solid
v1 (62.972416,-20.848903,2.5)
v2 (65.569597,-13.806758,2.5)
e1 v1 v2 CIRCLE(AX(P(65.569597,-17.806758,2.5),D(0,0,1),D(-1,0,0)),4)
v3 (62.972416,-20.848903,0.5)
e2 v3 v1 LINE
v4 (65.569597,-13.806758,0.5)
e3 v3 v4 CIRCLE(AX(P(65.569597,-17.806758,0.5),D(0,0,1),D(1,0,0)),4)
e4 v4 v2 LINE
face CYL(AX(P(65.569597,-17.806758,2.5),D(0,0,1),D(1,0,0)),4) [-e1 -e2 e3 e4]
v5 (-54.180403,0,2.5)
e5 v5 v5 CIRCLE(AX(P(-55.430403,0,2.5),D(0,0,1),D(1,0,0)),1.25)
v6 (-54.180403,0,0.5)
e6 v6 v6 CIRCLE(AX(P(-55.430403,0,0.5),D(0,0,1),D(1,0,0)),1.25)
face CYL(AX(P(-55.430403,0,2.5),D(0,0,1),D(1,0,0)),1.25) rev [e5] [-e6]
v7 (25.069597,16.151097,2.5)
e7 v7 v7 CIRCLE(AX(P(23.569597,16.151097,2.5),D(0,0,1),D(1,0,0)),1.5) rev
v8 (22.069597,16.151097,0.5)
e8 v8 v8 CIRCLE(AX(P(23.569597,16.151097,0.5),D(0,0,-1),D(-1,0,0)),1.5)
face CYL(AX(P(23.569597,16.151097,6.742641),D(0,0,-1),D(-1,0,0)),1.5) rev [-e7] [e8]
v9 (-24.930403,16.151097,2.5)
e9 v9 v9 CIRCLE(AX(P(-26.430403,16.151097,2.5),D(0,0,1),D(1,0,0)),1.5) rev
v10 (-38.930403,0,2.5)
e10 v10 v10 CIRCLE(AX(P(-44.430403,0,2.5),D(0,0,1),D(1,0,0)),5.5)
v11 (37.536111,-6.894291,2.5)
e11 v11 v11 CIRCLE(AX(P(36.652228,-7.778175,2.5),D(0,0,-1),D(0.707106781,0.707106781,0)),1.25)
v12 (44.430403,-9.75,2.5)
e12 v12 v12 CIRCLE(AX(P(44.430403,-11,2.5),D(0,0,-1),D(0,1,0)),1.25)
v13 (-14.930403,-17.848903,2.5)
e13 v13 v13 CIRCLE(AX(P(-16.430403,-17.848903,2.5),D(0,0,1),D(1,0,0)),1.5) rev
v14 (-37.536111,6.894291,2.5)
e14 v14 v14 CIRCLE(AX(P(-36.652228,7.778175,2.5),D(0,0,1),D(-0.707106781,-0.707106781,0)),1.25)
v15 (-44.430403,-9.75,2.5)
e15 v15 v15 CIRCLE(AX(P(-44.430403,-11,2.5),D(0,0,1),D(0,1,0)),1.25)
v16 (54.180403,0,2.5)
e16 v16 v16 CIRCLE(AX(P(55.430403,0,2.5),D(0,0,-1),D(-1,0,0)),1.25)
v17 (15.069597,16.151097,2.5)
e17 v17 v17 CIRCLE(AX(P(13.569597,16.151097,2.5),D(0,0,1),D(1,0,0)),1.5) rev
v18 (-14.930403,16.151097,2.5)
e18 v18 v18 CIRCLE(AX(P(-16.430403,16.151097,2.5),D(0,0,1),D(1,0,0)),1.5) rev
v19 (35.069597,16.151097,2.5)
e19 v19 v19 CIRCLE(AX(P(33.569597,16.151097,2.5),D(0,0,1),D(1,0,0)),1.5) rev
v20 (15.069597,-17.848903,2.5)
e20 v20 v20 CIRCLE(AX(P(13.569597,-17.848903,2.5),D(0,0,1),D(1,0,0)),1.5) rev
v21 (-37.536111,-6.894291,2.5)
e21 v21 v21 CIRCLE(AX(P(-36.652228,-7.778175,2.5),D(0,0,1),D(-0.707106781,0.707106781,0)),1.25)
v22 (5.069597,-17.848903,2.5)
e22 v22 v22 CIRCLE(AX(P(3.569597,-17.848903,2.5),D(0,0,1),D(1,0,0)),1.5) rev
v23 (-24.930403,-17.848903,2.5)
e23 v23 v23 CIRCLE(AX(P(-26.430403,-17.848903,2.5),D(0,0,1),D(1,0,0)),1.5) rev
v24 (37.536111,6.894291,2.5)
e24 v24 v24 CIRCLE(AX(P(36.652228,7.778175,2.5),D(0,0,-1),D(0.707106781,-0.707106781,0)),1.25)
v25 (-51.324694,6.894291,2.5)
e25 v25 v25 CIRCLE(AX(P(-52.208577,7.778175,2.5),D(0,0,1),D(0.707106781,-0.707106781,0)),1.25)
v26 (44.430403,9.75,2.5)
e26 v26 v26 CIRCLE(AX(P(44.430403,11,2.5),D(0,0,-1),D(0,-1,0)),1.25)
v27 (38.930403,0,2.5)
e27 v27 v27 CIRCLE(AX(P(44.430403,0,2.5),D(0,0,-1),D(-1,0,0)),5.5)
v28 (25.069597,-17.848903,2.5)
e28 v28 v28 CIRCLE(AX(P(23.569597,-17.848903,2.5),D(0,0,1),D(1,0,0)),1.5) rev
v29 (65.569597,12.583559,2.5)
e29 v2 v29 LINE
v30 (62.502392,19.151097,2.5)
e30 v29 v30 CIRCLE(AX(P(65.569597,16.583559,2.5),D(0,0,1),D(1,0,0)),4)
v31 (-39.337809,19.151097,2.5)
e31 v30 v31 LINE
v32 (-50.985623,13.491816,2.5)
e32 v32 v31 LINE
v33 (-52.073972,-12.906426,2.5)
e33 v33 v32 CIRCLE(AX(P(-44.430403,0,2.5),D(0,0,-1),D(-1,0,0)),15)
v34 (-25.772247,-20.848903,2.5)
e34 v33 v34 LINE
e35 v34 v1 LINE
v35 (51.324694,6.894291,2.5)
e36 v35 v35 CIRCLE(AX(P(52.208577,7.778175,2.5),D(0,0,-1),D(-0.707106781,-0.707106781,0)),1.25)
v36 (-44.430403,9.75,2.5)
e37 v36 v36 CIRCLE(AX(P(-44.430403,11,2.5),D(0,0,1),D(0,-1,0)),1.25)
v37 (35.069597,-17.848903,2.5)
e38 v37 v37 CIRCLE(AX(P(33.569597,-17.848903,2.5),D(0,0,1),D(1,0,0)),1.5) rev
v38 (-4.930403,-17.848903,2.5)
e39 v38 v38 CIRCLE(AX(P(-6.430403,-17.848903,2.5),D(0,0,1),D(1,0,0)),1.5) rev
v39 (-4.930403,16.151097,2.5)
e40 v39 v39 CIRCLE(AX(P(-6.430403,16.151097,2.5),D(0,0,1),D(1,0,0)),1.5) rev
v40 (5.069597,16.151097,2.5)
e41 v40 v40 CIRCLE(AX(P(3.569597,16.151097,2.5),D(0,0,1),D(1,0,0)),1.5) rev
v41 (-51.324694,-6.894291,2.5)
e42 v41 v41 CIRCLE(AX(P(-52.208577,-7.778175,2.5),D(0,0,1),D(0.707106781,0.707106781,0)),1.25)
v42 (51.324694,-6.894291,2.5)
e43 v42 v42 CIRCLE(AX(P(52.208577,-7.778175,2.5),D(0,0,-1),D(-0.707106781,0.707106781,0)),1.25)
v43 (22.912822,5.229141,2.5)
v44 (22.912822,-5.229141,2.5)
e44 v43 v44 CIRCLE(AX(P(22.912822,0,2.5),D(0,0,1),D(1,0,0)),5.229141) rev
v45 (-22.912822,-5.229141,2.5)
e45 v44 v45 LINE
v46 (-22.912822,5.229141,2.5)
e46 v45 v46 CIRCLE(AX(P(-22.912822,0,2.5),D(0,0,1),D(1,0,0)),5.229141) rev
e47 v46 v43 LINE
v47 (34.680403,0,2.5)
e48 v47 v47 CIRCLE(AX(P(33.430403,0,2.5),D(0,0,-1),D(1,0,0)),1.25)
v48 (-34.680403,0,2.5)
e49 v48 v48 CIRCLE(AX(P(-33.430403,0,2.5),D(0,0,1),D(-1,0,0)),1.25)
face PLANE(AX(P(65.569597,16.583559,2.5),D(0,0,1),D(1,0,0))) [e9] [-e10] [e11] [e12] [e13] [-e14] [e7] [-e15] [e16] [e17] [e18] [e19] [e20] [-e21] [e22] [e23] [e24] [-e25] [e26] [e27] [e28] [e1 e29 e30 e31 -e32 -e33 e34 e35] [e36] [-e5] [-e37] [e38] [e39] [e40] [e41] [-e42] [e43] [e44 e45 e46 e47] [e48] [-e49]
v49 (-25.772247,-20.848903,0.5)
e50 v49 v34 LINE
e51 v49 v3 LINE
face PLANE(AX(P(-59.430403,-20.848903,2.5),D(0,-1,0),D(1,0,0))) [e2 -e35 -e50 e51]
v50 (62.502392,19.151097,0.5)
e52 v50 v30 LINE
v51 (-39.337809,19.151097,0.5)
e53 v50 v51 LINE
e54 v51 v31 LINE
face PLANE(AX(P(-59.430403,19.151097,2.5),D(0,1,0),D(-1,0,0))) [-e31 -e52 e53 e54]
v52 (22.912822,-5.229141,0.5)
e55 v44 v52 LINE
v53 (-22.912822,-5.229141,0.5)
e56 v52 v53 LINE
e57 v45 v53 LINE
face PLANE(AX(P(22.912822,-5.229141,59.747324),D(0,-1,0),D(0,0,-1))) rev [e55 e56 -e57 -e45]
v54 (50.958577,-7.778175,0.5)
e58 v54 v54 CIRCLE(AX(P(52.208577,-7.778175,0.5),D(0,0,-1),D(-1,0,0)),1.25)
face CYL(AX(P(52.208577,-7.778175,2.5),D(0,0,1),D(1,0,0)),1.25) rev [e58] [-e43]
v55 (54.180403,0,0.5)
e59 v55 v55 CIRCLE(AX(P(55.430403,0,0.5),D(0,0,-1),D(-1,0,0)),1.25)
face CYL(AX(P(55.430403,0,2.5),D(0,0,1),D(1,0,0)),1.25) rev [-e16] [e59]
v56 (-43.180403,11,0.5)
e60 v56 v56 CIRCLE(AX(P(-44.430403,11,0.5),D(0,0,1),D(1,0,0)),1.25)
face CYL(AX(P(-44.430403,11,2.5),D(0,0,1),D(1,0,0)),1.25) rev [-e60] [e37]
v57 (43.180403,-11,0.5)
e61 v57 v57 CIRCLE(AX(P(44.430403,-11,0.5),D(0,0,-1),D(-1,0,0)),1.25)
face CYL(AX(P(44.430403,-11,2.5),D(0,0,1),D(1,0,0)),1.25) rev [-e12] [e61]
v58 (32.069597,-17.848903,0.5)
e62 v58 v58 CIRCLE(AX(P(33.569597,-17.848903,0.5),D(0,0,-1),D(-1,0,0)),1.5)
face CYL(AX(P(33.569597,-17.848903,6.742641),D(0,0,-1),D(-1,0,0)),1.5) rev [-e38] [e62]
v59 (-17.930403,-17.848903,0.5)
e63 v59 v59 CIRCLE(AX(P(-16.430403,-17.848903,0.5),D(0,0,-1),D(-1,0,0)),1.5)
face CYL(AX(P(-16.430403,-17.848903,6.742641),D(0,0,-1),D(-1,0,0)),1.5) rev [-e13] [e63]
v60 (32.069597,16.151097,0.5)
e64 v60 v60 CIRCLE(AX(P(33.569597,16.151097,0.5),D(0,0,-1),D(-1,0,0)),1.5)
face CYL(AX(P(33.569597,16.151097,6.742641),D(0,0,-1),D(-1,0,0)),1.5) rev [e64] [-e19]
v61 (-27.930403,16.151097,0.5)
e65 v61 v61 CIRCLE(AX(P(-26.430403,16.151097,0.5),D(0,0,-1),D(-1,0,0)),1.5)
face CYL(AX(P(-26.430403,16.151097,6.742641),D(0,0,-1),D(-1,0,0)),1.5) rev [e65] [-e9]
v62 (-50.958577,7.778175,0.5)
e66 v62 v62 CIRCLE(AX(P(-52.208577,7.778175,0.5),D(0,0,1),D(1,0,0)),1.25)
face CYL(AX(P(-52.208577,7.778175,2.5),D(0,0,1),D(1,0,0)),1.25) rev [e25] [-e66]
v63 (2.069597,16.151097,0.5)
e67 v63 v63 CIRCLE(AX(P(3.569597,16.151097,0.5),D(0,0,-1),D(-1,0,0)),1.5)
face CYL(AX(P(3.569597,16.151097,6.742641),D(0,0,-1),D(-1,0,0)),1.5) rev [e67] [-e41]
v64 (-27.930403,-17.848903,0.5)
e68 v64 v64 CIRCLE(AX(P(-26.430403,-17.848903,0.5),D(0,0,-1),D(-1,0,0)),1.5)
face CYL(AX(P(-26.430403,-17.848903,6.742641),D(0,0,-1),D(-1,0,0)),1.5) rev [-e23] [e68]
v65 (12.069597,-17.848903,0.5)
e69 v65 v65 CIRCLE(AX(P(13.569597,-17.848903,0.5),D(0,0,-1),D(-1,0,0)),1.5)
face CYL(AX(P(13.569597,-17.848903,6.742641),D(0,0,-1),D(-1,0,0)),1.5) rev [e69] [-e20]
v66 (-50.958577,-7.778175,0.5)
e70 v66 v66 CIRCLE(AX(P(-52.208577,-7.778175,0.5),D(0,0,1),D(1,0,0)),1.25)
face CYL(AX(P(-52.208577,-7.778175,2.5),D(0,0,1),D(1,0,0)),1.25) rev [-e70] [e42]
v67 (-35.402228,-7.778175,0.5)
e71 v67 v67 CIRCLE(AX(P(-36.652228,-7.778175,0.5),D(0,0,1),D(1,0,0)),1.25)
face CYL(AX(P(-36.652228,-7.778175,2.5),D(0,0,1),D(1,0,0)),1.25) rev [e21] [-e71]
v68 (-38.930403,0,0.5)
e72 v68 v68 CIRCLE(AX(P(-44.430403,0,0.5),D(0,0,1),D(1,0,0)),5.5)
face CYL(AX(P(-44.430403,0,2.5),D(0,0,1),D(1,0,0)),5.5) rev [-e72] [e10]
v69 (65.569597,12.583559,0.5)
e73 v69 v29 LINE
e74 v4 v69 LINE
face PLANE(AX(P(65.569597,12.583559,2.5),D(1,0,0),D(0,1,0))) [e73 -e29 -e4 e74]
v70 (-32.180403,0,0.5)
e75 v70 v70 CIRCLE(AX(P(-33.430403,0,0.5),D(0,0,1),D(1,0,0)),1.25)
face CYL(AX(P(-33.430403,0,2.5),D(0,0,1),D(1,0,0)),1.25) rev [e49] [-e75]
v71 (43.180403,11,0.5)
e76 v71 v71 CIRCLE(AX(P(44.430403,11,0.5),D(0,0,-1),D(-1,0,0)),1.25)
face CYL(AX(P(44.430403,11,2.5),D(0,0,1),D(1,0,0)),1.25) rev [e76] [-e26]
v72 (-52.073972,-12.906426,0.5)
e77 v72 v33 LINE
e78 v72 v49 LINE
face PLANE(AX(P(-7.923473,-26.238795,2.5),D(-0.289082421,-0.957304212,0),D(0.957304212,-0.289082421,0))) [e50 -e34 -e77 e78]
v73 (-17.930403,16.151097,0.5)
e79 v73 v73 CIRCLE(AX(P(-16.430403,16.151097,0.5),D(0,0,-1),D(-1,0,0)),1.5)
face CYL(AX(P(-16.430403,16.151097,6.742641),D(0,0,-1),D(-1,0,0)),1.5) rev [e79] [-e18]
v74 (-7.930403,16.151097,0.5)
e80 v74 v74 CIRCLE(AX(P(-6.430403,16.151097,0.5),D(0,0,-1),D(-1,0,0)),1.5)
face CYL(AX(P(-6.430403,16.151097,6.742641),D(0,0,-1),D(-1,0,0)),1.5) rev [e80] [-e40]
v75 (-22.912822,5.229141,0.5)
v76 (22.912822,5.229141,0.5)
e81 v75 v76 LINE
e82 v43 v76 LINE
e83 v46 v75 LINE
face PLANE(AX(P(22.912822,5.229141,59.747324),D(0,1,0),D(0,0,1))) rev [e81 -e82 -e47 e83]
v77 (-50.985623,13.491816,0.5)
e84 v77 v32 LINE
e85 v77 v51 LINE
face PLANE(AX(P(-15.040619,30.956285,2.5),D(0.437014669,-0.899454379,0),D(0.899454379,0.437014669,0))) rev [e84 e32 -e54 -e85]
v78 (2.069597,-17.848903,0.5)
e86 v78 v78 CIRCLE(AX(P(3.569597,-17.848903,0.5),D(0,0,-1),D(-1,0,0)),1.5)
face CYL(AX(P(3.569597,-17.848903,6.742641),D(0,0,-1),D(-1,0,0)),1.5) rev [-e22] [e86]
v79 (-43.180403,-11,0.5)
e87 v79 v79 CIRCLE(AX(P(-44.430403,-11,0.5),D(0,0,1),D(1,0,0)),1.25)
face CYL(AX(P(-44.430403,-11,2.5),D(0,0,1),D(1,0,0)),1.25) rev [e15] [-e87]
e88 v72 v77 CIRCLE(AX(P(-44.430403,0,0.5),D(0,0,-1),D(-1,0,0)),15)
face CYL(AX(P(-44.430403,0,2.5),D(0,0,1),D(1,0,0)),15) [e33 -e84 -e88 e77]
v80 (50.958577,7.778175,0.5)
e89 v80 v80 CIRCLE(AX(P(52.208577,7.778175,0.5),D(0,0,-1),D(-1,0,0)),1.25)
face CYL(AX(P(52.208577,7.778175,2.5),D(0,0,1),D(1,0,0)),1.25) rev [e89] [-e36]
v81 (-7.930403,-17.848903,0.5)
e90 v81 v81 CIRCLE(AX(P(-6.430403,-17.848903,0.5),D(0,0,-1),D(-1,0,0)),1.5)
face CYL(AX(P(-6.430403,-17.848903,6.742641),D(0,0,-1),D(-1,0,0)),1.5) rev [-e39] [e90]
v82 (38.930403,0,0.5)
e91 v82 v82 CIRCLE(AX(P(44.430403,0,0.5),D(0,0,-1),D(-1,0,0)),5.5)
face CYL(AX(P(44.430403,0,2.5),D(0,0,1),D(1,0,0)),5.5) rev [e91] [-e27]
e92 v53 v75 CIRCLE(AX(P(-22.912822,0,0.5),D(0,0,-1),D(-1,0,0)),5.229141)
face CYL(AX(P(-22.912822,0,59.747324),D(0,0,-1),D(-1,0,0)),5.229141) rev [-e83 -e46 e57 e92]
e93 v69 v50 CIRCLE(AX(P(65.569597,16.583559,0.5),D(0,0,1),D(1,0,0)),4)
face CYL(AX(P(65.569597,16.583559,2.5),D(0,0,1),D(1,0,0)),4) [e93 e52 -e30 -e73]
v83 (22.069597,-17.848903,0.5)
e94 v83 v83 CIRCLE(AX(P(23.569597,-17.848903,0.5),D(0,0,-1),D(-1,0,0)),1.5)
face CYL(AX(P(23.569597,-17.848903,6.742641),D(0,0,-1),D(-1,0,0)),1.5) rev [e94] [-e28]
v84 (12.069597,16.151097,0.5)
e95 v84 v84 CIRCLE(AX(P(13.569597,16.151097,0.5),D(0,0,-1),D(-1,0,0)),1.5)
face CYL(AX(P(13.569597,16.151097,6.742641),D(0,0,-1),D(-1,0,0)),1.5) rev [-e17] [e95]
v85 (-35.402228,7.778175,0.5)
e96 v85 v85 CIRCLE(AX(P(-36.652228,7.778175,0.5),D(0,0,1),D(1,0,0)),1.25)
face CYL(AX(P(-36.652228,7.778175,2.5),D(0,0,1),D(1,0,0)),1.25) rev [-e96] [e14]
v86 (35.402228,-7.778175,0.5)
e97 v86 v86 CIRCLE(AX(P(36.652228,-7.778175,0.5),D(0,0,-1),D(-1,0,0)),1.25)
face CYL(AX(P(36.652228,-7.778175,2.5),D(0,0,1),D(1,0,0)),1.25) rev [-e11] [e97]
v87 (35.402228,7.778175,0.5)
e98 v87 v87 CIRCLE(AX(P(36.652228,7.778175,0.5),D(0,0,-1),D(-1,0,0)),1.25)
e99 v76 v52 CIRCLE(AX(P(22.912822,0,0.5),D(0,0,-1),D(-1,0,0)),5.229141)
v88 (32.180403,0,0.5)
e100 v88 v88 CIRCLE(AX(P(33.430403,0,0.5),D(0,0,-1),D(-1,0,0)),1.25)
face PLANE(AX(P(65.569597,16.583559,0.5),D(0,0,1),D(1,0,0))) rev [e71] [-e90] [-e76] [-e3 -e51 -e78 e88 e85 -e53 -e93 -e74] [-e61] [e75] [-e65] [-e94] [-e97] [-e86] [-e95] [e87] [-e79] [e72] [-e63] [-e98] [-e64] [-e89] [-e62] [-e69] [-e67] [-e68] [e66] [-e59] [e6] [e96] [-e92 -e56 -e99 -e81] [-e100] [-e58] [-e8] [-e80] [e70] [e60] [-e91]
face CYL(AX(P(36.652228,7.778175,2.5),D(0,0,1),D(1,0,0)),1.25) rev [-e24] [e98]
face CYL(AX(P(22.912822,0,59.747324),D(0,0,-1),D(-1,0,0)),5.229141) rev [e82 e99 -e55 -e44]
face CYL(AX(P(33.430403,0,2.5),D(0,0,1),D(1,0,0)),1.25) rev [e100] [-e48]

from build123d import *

# Parameters (mm, degrees)
RESSALTO_EXTRUS_O1_DEPTH      = 2.5
ESBO_O2_R                     = 5.5
CORTE_EXTRUS_O1_DEPTH         = 5
ESBO_O3_R                     = 1.25
CORTE_EXTRUS_O2_DEPTH         = 5
PADR_OCIRCULAR1_COUNT         = 8
ESPELHAR1_COPY_1_SKETCH_R     = 1.25
ESPELHAR1_COPY_1_DEPTH        = 5
ESPELHAR1_COPY_2_SKETCH_R     = 1.25
ESPELHAR1_COPY_2_DEPTH        = 5
ESPELHAR1_COPY_3_SKETCH_R     = 1.25
ESPELHAR1_COPY_3_DEPTH        = 5
ESPELHAR1_COPY_4_SKETCH_R     = 1.25
ESPELHAR1_COPY_4_DEPTH        = 5
ESPELHAR1_COPY_5_SKETCH_R     = 1.25
ESPELHAR1_COPY_5_DEPTH        = 5
ESPELHAR1_COPY_6_SKETCH_R     = 1.25
ESPELHAR1_COPY_6_DEPTH        = 5
ESPELHAR1_COPY_7_SKETCH_R     = 1.25
ESPELHAR1_COPY_7_DEPTH        = 5
CORTE_EXTRUS_O5_DEPTH         = 74.078475416
CORTE_EXTRUS_O5_DEPTH_BACK    = 74.078475416
CONVERTER_S_LIDO1_START       = -2.5
CONVERTER_S_LIDO1_OUTLINE_R   = 1.25
CONVERTER_S_LIDO1_OUTLINE_R_2 = 5.5
CONVERTER_S_LIDO1_DEPTH       = 3
ESBO_O8_R                     = 1.5
CORTE_EXTRUS_O3_DEPTH         = 2
PADR_O_LINEAR1_COUNT          = 7
PADR_O_LINEAR1_PITCH          = 10
CORTE_EXTRUS_O4_DEPTH         = 2


# Read off the part's stored shape, not the designer's step: Converter-Sólido1
with BuildPart() as part:
    # Esboço1 → Ressalto-extrusão1 (new, symmetric)
    with BuildSketch(Plane.XY):
        with BuildLine():
            Line((-59.430402553, 19.151096923), (62.502392295, 19.151096923))
            ThreePointArc((62.502392295, 19.151096923), (69.19383205, 18.276167196), (65.569597447, 12.583558694))
            Line((65.569597447, 12.583558694), (65.569597447, -13.806757673))
            ThreePointArc((65.569597447, -13.806757673), (69.322501763, -19.190849142), (62.972416023, -20.848903077))
            Line((62.972416023, -20.848903077), (-59.430402553, -20.848903077))
            Line((-59.430402553, -20.848903077), (-59.430402553, 19.151096923))
        make_face()
    extrude(amount=RESSALTO_EXTRUS_O1_DEPTH, both=True)

    # Esboço2 → Corte-extrusão1 (cut)
    with BuildSketch(Plane.XY.offset(2.5)):
        with Locations((-44.430402553, 0)):
            Circle(ESBO_O2_R)
    corte_extrus_o1 = extrude(amount=-CORTE_EXTRUS_O1_DEPTH, mode=Mode.SUBTRACT)

    # Esboço3 → Corte-extrusão2 (cut)
    with BuildSketch(Plane.XY.offset(2.5)):
        with Locations((-55.430402553, 0)):
            Circle(ESBO_O3_R)
    corte_extrus_o2 = extrude(amount=-CORTE_EXTRUS_O2_DEPTH, mode=Mode.SUBTRACT)

    # PadrãoCircular1: Corte-extrusão2 ×8 about axis
    padr_ocircular1_axis = Axis((-44.430402553, 0, 0), (0, 0, 1))
    for i in range(1, PADR_OCIRCULAR1_COUNT):
        add(corte_extrus_o2.rotate(padr_ocircular1_axis, i * 360 / PADR_OCIRCULAR1_COUNT), mode=Mode.SUBTRACT)

    # Espelhar1: Corte-extrusão1, Corte-extrusão2 across plane
    add(corte_extrus_o1.mirror(Plane(origin=(0, 0, 0), x_dir=(0, 0, 1), z_dir=(1, 0, 0))), mode=Mode.SUBTRACT)
    add(corte_extrus_o2.mirror(Plane(origin=(0, 0, 0), x_dir=(0, 0, 1), z_dir=(1, 0, 0))), mode=Mode.SUBTRACT)

    # Espelhar1 copy 1 sketch → Espelhar1 copy 1 (cut)
    with BuildSketch(Plane(origin=(13.013363617, 31.417038936, 2.5), x_dir=(-0.7071067811865476, 0.7071067811865475, 0), z_dir=(0, 0, 1))):
        with Locations((-55.430402553, 0)):
            Circle(ESPELHAR1_COPY_1_SKETCH_R)
    extrude(amount=-ESPELHAR1_COPY_1_DEPTH, mode=Mode.SUBTRACT)

    # Espelhar1 copy 2 sketch → Espelhar1 copy 2 (cut)
    with BuildSketch(Plane(origin=(44.430402553, 44.430402553, 2.5), x_dir=(0, 1, 0), z_dir=(0, 0, 1))):
        with Locations((-55.430402553, 0)):
            Circle(ESPELHAR1_COPY_2_SKETCH_R)
    extrude(amount=-ESPELHAR1_COPY_2_DEPTH, mode=Mode.SUBTRACT)

    # Espelhar1 copy 3 sketch → Espelhar1 copy 3 (cut)
    with BuildSketch(Plane(origin=(75.847441489, 31.417038936, 2.5), x_dir=(0.7071067811865475, 0.7071067811865476, 0), z_dir=(0, 0, 1))):
        with Locations((-55.430402553, 0)):
            Circle(ESPELHAR1_COPY_3_SKETCH_R)
    extrude(amount=-ESPELHAR1_COPY_3_DEPTH, mode=Mode.SUBTRACT)

    # Espelhar1 copy 4 sketch → Espelhar1 copy 4 (cut)
    with BuildSketch(Plane(origin=(88.860805106, 0, 2.5), x_dir=(1, 0, 0), z_dir=(0, 0, 1))):
        with Locations((-55.430402553, 0)):
            Circle(ESPELHAR1_COPY_4_SKETCH_R)
    extrude(amount=-ESPELHAR1_COPY_4_DEPTH, mode=Mode.SUBTRACT)

    # Espelhar1 copy 5 sketch → Espelhar1 copy 5 (cut)
    with BuildSketch(Plane(origin=(75.847441489, -31.417038936, 2.5), x_dir=(0.7071067811865477, -0.7071067811865475, 0), z_dir=(0, 0, 1))):
        with Locations((-55.430402553, 0)):
            Circle(ESPELHAR1_COPY_5_SKETCH_R)
    extrude(amount=-ESPELHAR1_COPY_5_DEPTH, mode=Mode.SUBTRACT)

    # Espelhar1 copy 6 sketch → Espelhar1 copy 6 (cut)
    with BuildSketch(Plane(origin=(44.430402553, -44.430402553, 2.5), x_dir=(0, -1, 0), z_dir=(0, 0, 1))):
        with Locations((-55.430402553, 0)):
            Circle(ESPELHAR1_COPY_6_SKETCH_R)
    extrude(amount=-ESPELHAR1_COPY_6_DEPTH, mode=Mode.SUBTRACT)

    # Espelhar1 copy 7 sketch → Espelhar1 copy 7 (cut)
    with BuildSketch(Plane(origin=(13.013363617, -31.417038936, 2.5), x_dir=(-0.7071067811865474, -0.7071067811865477, 0), z_dir=(0, 0, 1))):
        with Locations((-55.430402553, 0)):
            Circle(ESPELHAR1_COPY_7_SKETCH_R)
    extrude(amount=-ESPELHAR1_COPY_7_DEPTH, mode=Mode.SUBTRACT)

    # Esboço10 → Corte-extrusão5 (cut, two sides: drawn at the far end of the back side and taken through both)
    with BuildSketch(Plane(origin=(0, 0, -2.5), x_dir=(-1, 0, 0), z_dir=(0, 0, -1)).offset(-CORTE_EXTRUS_O5_DEPTH_BACK)):
        with BuildLine():
            Line((50.985622588, 13.491815678), (39.337809239, 19.151096923))
            Line((39.337809239, 19.151096923), (39.337809239, 27.419939303))
            Line((39.337809239, 27.419939303), (72.861321118, 27.419939303))
            Line((72.861321118, 27.419939303), (72.861321118, -27.215460657))
            Line((72.861321118, -27.215460657), (25.772247119, -27.215460657))
            Line((25.772247119, -27.215460657), (25.772247119, -20.848903077))
            Line((25.772247119, -20.848903077), (52.073972286, -12.906426373))
            ThreePointArc((52.073972286, -12.906426373), (59.417670602, 0.617896776), (50.985622588, 13.491815678))
        make_face()
    extrude(amount=CORTE_EXTRUS_O5_DEPTH + CORTE_EXTRUS_O5_DEPTH_BACK, mode=Mode.SUBTRACT)

    # Converter-Sólido1 outline → Converter-Sólido1 (cut)
    with BuildSketch(Plane.XY.offset(CONVERTER_S_LIDO1_START)):
        with BuildLine():
            Line((62.502392295, 19.151096923), (-39.337809239, 19.151096923))
            Line((-39.337809239, 19.151096923), (-50.985622588, 13.491815678))
            ThreePointArc((-50.985622588, 13.491815678), (-59.417670602, 0.617896776), (-52.073972286, -12.906426373))
            Line((-52.073972286, -12.906426373), (-25.772247119, -20.848903077))
            Line((-25.772247119, -20.848903077), (62.972416023, -20.848903077))
            ThreePointArc((62.972416023, -20.848903077), (69.322501763, -19.190849142), (65.569597447, -13.806757673))
            Line((65.569597447, -13.806757673), (65.569597447, 12.583558694))
            ThreePointArc((65.569597447, 12.583558694), (69.19383205, 18.276167196), (62.502392295, 19.151096923))
        make_face()
        with Locations((-44.430402553, -11)):
            Circle(CONVERTER_S_LIDO1_OUTLINE_R, mode=Mode.SUBTRACT)
        with Locations((-52.208577146, -7.778174593)):
            Circle(CONVERTER_S_LIDO1_OUTLINE_R, mode=Mode.SUBTRACT)
        with Locations((-36.65222796, -7.778174593)):
            Circle(CONVERTER_S_LIDO1_OUTLINE_R, mode=Mode.SUBTRACT)
        with Locations((36.65222796, -7.778174593)):
            Circle(CONVERTER_S_LIDO1_OUTLINE_R, mode=Mode.SUBTRACT)
        with Locations((44.430402553, -11)):
            Circle(CONVERTER_S_LIDO1_OUTLINE_R, mode=Mode.SUBTRACT)
        with Locations((52.208577146, -7.778174593)):
            Circle(CONVERTER_S_LIDO1_OUTLINE_R, mode=Mode.SUBTRACT)
        with Locations((-55.430402553, 0)):
            Circle(CONVERTER_S_LIDO1_OUTLINE_R, mode=Mode.SUBTRACT)
        with Locations((-44.430402553, 0)):
            Circle(CONVERTER_S_LIDO1_OUTLINE_R_2, mode=Mode.SUBTRACT)
        with Locations((-33.430402553, 0)):
            Circle(CONVERTER_S_LIDO1_OUTLINE_R, mode=Mode.SUBTRACT)
        with Locations((-52.208577146, 7.778174593)):
            Circle(CONVERTER_S_LIDO1_OUTLINE_R, mode=Mode.SUBTRACT)
        with Locations((-36.65222796, 7.778174593)):
            Circle(CONVERTER_S_LIDO1_OUTLINE_R, mode=Mode.SUBTRACT)
        with Locations((-44.430402553, 11)):
            Circle(CONVERTER_S_LIDO1_OUTLINE_R, mode=Mode.SUBTRACT)
        with Locations((33.430402553, 0)):
            Circle(CONVERTER_S_LIDO1_OUTLINE_R, mode=Mode.SUBTRACT)
        with Locations((36.65222796, 7.778174593)):
            Circle(CONVERTER_S_LIDO1_OUTLINE_R, mode=Mode.SUBTRACT)
        with Locations((44.430402553, 0)):
            Circle(CONVERTER_S_LIDO1_OUTLINE_R_2, mode=Mode.SUBTRACT)
        with Locations((55.430402553, 0)):
            Circle(CONVERTER_S_LIDO1_OUTLINE_R, mode=Mode.SUBTRACT)
        with Locations((52.208577146, 7.778174593)):
            Circle(CONVERTER_S_LIDO1_OUTLINE_R, mode=Mode.SUBTRACT)
        with Locations((44.430402553, 11)):
            Circle(CONVERTER_S_LIDO1_OUTLINE_R, mode=Mode.SUBTRACT)
    extrude(amount=CONVERTER_S_LIDO1_DEPTH, mode=Mode.SUBTRACT)

    # Esboço8 → Corte-extrusão3 (cut)
    with BuildSketch(Plane(origin=(0, 0, 0.5), x_dir=(-1, 0, 0), z_dir=(0, 0, -1))):
        with Locations((26.430402553, 16.151096923)):
            Circle(ESBO_O8_R)
        with Locations((26.430402553, -17.848903077)):
            Circle(ESBO_O8_R)
    corte_extrus_o3 = extrude(amount=-CORTE_EXTRUS_O3_DEPTH, mode=Mode.SUBTRACT)

    # Padrão linear1: Corte-extrusão3 ×7
    with Locations(*[(i * PADR_O_LINEAR1_PITCH, 0, 0) for i in range(1, PADR_O_LINEAR1_COUNT)]):
        add(corte_extrus_o3, mode=Mode.SUBTRACT)

    # Esboço9 → Corte-extrusão4 (cut)
    with BuildSketch(Plane(origin=(0, 0, 0.5), x_dir=(-1, 0, 0), z_dir=(0, 0, -1))):
        with BuildLine():
            Line((-22.912822242, 5.229141159), (22.912822242, 5.229141159))
            ThreePointArc((22.912822242, 5.229141159), (28.1419634, 0), (22.912822242, -5.229141159))
            Line((22.912822242, -5.229141159), (-22.912822242, -5.229141159))
            ThreePointArc((-22.912822242, -5.229141159), (-28.1419634, 0), (-22.912822242, 5.229141159))
        make_face()
    extrude(amount=-CORTE_EXTRUS_O4_DEPTH, mode=Mode.SUBTRACT)


solid = part.part
